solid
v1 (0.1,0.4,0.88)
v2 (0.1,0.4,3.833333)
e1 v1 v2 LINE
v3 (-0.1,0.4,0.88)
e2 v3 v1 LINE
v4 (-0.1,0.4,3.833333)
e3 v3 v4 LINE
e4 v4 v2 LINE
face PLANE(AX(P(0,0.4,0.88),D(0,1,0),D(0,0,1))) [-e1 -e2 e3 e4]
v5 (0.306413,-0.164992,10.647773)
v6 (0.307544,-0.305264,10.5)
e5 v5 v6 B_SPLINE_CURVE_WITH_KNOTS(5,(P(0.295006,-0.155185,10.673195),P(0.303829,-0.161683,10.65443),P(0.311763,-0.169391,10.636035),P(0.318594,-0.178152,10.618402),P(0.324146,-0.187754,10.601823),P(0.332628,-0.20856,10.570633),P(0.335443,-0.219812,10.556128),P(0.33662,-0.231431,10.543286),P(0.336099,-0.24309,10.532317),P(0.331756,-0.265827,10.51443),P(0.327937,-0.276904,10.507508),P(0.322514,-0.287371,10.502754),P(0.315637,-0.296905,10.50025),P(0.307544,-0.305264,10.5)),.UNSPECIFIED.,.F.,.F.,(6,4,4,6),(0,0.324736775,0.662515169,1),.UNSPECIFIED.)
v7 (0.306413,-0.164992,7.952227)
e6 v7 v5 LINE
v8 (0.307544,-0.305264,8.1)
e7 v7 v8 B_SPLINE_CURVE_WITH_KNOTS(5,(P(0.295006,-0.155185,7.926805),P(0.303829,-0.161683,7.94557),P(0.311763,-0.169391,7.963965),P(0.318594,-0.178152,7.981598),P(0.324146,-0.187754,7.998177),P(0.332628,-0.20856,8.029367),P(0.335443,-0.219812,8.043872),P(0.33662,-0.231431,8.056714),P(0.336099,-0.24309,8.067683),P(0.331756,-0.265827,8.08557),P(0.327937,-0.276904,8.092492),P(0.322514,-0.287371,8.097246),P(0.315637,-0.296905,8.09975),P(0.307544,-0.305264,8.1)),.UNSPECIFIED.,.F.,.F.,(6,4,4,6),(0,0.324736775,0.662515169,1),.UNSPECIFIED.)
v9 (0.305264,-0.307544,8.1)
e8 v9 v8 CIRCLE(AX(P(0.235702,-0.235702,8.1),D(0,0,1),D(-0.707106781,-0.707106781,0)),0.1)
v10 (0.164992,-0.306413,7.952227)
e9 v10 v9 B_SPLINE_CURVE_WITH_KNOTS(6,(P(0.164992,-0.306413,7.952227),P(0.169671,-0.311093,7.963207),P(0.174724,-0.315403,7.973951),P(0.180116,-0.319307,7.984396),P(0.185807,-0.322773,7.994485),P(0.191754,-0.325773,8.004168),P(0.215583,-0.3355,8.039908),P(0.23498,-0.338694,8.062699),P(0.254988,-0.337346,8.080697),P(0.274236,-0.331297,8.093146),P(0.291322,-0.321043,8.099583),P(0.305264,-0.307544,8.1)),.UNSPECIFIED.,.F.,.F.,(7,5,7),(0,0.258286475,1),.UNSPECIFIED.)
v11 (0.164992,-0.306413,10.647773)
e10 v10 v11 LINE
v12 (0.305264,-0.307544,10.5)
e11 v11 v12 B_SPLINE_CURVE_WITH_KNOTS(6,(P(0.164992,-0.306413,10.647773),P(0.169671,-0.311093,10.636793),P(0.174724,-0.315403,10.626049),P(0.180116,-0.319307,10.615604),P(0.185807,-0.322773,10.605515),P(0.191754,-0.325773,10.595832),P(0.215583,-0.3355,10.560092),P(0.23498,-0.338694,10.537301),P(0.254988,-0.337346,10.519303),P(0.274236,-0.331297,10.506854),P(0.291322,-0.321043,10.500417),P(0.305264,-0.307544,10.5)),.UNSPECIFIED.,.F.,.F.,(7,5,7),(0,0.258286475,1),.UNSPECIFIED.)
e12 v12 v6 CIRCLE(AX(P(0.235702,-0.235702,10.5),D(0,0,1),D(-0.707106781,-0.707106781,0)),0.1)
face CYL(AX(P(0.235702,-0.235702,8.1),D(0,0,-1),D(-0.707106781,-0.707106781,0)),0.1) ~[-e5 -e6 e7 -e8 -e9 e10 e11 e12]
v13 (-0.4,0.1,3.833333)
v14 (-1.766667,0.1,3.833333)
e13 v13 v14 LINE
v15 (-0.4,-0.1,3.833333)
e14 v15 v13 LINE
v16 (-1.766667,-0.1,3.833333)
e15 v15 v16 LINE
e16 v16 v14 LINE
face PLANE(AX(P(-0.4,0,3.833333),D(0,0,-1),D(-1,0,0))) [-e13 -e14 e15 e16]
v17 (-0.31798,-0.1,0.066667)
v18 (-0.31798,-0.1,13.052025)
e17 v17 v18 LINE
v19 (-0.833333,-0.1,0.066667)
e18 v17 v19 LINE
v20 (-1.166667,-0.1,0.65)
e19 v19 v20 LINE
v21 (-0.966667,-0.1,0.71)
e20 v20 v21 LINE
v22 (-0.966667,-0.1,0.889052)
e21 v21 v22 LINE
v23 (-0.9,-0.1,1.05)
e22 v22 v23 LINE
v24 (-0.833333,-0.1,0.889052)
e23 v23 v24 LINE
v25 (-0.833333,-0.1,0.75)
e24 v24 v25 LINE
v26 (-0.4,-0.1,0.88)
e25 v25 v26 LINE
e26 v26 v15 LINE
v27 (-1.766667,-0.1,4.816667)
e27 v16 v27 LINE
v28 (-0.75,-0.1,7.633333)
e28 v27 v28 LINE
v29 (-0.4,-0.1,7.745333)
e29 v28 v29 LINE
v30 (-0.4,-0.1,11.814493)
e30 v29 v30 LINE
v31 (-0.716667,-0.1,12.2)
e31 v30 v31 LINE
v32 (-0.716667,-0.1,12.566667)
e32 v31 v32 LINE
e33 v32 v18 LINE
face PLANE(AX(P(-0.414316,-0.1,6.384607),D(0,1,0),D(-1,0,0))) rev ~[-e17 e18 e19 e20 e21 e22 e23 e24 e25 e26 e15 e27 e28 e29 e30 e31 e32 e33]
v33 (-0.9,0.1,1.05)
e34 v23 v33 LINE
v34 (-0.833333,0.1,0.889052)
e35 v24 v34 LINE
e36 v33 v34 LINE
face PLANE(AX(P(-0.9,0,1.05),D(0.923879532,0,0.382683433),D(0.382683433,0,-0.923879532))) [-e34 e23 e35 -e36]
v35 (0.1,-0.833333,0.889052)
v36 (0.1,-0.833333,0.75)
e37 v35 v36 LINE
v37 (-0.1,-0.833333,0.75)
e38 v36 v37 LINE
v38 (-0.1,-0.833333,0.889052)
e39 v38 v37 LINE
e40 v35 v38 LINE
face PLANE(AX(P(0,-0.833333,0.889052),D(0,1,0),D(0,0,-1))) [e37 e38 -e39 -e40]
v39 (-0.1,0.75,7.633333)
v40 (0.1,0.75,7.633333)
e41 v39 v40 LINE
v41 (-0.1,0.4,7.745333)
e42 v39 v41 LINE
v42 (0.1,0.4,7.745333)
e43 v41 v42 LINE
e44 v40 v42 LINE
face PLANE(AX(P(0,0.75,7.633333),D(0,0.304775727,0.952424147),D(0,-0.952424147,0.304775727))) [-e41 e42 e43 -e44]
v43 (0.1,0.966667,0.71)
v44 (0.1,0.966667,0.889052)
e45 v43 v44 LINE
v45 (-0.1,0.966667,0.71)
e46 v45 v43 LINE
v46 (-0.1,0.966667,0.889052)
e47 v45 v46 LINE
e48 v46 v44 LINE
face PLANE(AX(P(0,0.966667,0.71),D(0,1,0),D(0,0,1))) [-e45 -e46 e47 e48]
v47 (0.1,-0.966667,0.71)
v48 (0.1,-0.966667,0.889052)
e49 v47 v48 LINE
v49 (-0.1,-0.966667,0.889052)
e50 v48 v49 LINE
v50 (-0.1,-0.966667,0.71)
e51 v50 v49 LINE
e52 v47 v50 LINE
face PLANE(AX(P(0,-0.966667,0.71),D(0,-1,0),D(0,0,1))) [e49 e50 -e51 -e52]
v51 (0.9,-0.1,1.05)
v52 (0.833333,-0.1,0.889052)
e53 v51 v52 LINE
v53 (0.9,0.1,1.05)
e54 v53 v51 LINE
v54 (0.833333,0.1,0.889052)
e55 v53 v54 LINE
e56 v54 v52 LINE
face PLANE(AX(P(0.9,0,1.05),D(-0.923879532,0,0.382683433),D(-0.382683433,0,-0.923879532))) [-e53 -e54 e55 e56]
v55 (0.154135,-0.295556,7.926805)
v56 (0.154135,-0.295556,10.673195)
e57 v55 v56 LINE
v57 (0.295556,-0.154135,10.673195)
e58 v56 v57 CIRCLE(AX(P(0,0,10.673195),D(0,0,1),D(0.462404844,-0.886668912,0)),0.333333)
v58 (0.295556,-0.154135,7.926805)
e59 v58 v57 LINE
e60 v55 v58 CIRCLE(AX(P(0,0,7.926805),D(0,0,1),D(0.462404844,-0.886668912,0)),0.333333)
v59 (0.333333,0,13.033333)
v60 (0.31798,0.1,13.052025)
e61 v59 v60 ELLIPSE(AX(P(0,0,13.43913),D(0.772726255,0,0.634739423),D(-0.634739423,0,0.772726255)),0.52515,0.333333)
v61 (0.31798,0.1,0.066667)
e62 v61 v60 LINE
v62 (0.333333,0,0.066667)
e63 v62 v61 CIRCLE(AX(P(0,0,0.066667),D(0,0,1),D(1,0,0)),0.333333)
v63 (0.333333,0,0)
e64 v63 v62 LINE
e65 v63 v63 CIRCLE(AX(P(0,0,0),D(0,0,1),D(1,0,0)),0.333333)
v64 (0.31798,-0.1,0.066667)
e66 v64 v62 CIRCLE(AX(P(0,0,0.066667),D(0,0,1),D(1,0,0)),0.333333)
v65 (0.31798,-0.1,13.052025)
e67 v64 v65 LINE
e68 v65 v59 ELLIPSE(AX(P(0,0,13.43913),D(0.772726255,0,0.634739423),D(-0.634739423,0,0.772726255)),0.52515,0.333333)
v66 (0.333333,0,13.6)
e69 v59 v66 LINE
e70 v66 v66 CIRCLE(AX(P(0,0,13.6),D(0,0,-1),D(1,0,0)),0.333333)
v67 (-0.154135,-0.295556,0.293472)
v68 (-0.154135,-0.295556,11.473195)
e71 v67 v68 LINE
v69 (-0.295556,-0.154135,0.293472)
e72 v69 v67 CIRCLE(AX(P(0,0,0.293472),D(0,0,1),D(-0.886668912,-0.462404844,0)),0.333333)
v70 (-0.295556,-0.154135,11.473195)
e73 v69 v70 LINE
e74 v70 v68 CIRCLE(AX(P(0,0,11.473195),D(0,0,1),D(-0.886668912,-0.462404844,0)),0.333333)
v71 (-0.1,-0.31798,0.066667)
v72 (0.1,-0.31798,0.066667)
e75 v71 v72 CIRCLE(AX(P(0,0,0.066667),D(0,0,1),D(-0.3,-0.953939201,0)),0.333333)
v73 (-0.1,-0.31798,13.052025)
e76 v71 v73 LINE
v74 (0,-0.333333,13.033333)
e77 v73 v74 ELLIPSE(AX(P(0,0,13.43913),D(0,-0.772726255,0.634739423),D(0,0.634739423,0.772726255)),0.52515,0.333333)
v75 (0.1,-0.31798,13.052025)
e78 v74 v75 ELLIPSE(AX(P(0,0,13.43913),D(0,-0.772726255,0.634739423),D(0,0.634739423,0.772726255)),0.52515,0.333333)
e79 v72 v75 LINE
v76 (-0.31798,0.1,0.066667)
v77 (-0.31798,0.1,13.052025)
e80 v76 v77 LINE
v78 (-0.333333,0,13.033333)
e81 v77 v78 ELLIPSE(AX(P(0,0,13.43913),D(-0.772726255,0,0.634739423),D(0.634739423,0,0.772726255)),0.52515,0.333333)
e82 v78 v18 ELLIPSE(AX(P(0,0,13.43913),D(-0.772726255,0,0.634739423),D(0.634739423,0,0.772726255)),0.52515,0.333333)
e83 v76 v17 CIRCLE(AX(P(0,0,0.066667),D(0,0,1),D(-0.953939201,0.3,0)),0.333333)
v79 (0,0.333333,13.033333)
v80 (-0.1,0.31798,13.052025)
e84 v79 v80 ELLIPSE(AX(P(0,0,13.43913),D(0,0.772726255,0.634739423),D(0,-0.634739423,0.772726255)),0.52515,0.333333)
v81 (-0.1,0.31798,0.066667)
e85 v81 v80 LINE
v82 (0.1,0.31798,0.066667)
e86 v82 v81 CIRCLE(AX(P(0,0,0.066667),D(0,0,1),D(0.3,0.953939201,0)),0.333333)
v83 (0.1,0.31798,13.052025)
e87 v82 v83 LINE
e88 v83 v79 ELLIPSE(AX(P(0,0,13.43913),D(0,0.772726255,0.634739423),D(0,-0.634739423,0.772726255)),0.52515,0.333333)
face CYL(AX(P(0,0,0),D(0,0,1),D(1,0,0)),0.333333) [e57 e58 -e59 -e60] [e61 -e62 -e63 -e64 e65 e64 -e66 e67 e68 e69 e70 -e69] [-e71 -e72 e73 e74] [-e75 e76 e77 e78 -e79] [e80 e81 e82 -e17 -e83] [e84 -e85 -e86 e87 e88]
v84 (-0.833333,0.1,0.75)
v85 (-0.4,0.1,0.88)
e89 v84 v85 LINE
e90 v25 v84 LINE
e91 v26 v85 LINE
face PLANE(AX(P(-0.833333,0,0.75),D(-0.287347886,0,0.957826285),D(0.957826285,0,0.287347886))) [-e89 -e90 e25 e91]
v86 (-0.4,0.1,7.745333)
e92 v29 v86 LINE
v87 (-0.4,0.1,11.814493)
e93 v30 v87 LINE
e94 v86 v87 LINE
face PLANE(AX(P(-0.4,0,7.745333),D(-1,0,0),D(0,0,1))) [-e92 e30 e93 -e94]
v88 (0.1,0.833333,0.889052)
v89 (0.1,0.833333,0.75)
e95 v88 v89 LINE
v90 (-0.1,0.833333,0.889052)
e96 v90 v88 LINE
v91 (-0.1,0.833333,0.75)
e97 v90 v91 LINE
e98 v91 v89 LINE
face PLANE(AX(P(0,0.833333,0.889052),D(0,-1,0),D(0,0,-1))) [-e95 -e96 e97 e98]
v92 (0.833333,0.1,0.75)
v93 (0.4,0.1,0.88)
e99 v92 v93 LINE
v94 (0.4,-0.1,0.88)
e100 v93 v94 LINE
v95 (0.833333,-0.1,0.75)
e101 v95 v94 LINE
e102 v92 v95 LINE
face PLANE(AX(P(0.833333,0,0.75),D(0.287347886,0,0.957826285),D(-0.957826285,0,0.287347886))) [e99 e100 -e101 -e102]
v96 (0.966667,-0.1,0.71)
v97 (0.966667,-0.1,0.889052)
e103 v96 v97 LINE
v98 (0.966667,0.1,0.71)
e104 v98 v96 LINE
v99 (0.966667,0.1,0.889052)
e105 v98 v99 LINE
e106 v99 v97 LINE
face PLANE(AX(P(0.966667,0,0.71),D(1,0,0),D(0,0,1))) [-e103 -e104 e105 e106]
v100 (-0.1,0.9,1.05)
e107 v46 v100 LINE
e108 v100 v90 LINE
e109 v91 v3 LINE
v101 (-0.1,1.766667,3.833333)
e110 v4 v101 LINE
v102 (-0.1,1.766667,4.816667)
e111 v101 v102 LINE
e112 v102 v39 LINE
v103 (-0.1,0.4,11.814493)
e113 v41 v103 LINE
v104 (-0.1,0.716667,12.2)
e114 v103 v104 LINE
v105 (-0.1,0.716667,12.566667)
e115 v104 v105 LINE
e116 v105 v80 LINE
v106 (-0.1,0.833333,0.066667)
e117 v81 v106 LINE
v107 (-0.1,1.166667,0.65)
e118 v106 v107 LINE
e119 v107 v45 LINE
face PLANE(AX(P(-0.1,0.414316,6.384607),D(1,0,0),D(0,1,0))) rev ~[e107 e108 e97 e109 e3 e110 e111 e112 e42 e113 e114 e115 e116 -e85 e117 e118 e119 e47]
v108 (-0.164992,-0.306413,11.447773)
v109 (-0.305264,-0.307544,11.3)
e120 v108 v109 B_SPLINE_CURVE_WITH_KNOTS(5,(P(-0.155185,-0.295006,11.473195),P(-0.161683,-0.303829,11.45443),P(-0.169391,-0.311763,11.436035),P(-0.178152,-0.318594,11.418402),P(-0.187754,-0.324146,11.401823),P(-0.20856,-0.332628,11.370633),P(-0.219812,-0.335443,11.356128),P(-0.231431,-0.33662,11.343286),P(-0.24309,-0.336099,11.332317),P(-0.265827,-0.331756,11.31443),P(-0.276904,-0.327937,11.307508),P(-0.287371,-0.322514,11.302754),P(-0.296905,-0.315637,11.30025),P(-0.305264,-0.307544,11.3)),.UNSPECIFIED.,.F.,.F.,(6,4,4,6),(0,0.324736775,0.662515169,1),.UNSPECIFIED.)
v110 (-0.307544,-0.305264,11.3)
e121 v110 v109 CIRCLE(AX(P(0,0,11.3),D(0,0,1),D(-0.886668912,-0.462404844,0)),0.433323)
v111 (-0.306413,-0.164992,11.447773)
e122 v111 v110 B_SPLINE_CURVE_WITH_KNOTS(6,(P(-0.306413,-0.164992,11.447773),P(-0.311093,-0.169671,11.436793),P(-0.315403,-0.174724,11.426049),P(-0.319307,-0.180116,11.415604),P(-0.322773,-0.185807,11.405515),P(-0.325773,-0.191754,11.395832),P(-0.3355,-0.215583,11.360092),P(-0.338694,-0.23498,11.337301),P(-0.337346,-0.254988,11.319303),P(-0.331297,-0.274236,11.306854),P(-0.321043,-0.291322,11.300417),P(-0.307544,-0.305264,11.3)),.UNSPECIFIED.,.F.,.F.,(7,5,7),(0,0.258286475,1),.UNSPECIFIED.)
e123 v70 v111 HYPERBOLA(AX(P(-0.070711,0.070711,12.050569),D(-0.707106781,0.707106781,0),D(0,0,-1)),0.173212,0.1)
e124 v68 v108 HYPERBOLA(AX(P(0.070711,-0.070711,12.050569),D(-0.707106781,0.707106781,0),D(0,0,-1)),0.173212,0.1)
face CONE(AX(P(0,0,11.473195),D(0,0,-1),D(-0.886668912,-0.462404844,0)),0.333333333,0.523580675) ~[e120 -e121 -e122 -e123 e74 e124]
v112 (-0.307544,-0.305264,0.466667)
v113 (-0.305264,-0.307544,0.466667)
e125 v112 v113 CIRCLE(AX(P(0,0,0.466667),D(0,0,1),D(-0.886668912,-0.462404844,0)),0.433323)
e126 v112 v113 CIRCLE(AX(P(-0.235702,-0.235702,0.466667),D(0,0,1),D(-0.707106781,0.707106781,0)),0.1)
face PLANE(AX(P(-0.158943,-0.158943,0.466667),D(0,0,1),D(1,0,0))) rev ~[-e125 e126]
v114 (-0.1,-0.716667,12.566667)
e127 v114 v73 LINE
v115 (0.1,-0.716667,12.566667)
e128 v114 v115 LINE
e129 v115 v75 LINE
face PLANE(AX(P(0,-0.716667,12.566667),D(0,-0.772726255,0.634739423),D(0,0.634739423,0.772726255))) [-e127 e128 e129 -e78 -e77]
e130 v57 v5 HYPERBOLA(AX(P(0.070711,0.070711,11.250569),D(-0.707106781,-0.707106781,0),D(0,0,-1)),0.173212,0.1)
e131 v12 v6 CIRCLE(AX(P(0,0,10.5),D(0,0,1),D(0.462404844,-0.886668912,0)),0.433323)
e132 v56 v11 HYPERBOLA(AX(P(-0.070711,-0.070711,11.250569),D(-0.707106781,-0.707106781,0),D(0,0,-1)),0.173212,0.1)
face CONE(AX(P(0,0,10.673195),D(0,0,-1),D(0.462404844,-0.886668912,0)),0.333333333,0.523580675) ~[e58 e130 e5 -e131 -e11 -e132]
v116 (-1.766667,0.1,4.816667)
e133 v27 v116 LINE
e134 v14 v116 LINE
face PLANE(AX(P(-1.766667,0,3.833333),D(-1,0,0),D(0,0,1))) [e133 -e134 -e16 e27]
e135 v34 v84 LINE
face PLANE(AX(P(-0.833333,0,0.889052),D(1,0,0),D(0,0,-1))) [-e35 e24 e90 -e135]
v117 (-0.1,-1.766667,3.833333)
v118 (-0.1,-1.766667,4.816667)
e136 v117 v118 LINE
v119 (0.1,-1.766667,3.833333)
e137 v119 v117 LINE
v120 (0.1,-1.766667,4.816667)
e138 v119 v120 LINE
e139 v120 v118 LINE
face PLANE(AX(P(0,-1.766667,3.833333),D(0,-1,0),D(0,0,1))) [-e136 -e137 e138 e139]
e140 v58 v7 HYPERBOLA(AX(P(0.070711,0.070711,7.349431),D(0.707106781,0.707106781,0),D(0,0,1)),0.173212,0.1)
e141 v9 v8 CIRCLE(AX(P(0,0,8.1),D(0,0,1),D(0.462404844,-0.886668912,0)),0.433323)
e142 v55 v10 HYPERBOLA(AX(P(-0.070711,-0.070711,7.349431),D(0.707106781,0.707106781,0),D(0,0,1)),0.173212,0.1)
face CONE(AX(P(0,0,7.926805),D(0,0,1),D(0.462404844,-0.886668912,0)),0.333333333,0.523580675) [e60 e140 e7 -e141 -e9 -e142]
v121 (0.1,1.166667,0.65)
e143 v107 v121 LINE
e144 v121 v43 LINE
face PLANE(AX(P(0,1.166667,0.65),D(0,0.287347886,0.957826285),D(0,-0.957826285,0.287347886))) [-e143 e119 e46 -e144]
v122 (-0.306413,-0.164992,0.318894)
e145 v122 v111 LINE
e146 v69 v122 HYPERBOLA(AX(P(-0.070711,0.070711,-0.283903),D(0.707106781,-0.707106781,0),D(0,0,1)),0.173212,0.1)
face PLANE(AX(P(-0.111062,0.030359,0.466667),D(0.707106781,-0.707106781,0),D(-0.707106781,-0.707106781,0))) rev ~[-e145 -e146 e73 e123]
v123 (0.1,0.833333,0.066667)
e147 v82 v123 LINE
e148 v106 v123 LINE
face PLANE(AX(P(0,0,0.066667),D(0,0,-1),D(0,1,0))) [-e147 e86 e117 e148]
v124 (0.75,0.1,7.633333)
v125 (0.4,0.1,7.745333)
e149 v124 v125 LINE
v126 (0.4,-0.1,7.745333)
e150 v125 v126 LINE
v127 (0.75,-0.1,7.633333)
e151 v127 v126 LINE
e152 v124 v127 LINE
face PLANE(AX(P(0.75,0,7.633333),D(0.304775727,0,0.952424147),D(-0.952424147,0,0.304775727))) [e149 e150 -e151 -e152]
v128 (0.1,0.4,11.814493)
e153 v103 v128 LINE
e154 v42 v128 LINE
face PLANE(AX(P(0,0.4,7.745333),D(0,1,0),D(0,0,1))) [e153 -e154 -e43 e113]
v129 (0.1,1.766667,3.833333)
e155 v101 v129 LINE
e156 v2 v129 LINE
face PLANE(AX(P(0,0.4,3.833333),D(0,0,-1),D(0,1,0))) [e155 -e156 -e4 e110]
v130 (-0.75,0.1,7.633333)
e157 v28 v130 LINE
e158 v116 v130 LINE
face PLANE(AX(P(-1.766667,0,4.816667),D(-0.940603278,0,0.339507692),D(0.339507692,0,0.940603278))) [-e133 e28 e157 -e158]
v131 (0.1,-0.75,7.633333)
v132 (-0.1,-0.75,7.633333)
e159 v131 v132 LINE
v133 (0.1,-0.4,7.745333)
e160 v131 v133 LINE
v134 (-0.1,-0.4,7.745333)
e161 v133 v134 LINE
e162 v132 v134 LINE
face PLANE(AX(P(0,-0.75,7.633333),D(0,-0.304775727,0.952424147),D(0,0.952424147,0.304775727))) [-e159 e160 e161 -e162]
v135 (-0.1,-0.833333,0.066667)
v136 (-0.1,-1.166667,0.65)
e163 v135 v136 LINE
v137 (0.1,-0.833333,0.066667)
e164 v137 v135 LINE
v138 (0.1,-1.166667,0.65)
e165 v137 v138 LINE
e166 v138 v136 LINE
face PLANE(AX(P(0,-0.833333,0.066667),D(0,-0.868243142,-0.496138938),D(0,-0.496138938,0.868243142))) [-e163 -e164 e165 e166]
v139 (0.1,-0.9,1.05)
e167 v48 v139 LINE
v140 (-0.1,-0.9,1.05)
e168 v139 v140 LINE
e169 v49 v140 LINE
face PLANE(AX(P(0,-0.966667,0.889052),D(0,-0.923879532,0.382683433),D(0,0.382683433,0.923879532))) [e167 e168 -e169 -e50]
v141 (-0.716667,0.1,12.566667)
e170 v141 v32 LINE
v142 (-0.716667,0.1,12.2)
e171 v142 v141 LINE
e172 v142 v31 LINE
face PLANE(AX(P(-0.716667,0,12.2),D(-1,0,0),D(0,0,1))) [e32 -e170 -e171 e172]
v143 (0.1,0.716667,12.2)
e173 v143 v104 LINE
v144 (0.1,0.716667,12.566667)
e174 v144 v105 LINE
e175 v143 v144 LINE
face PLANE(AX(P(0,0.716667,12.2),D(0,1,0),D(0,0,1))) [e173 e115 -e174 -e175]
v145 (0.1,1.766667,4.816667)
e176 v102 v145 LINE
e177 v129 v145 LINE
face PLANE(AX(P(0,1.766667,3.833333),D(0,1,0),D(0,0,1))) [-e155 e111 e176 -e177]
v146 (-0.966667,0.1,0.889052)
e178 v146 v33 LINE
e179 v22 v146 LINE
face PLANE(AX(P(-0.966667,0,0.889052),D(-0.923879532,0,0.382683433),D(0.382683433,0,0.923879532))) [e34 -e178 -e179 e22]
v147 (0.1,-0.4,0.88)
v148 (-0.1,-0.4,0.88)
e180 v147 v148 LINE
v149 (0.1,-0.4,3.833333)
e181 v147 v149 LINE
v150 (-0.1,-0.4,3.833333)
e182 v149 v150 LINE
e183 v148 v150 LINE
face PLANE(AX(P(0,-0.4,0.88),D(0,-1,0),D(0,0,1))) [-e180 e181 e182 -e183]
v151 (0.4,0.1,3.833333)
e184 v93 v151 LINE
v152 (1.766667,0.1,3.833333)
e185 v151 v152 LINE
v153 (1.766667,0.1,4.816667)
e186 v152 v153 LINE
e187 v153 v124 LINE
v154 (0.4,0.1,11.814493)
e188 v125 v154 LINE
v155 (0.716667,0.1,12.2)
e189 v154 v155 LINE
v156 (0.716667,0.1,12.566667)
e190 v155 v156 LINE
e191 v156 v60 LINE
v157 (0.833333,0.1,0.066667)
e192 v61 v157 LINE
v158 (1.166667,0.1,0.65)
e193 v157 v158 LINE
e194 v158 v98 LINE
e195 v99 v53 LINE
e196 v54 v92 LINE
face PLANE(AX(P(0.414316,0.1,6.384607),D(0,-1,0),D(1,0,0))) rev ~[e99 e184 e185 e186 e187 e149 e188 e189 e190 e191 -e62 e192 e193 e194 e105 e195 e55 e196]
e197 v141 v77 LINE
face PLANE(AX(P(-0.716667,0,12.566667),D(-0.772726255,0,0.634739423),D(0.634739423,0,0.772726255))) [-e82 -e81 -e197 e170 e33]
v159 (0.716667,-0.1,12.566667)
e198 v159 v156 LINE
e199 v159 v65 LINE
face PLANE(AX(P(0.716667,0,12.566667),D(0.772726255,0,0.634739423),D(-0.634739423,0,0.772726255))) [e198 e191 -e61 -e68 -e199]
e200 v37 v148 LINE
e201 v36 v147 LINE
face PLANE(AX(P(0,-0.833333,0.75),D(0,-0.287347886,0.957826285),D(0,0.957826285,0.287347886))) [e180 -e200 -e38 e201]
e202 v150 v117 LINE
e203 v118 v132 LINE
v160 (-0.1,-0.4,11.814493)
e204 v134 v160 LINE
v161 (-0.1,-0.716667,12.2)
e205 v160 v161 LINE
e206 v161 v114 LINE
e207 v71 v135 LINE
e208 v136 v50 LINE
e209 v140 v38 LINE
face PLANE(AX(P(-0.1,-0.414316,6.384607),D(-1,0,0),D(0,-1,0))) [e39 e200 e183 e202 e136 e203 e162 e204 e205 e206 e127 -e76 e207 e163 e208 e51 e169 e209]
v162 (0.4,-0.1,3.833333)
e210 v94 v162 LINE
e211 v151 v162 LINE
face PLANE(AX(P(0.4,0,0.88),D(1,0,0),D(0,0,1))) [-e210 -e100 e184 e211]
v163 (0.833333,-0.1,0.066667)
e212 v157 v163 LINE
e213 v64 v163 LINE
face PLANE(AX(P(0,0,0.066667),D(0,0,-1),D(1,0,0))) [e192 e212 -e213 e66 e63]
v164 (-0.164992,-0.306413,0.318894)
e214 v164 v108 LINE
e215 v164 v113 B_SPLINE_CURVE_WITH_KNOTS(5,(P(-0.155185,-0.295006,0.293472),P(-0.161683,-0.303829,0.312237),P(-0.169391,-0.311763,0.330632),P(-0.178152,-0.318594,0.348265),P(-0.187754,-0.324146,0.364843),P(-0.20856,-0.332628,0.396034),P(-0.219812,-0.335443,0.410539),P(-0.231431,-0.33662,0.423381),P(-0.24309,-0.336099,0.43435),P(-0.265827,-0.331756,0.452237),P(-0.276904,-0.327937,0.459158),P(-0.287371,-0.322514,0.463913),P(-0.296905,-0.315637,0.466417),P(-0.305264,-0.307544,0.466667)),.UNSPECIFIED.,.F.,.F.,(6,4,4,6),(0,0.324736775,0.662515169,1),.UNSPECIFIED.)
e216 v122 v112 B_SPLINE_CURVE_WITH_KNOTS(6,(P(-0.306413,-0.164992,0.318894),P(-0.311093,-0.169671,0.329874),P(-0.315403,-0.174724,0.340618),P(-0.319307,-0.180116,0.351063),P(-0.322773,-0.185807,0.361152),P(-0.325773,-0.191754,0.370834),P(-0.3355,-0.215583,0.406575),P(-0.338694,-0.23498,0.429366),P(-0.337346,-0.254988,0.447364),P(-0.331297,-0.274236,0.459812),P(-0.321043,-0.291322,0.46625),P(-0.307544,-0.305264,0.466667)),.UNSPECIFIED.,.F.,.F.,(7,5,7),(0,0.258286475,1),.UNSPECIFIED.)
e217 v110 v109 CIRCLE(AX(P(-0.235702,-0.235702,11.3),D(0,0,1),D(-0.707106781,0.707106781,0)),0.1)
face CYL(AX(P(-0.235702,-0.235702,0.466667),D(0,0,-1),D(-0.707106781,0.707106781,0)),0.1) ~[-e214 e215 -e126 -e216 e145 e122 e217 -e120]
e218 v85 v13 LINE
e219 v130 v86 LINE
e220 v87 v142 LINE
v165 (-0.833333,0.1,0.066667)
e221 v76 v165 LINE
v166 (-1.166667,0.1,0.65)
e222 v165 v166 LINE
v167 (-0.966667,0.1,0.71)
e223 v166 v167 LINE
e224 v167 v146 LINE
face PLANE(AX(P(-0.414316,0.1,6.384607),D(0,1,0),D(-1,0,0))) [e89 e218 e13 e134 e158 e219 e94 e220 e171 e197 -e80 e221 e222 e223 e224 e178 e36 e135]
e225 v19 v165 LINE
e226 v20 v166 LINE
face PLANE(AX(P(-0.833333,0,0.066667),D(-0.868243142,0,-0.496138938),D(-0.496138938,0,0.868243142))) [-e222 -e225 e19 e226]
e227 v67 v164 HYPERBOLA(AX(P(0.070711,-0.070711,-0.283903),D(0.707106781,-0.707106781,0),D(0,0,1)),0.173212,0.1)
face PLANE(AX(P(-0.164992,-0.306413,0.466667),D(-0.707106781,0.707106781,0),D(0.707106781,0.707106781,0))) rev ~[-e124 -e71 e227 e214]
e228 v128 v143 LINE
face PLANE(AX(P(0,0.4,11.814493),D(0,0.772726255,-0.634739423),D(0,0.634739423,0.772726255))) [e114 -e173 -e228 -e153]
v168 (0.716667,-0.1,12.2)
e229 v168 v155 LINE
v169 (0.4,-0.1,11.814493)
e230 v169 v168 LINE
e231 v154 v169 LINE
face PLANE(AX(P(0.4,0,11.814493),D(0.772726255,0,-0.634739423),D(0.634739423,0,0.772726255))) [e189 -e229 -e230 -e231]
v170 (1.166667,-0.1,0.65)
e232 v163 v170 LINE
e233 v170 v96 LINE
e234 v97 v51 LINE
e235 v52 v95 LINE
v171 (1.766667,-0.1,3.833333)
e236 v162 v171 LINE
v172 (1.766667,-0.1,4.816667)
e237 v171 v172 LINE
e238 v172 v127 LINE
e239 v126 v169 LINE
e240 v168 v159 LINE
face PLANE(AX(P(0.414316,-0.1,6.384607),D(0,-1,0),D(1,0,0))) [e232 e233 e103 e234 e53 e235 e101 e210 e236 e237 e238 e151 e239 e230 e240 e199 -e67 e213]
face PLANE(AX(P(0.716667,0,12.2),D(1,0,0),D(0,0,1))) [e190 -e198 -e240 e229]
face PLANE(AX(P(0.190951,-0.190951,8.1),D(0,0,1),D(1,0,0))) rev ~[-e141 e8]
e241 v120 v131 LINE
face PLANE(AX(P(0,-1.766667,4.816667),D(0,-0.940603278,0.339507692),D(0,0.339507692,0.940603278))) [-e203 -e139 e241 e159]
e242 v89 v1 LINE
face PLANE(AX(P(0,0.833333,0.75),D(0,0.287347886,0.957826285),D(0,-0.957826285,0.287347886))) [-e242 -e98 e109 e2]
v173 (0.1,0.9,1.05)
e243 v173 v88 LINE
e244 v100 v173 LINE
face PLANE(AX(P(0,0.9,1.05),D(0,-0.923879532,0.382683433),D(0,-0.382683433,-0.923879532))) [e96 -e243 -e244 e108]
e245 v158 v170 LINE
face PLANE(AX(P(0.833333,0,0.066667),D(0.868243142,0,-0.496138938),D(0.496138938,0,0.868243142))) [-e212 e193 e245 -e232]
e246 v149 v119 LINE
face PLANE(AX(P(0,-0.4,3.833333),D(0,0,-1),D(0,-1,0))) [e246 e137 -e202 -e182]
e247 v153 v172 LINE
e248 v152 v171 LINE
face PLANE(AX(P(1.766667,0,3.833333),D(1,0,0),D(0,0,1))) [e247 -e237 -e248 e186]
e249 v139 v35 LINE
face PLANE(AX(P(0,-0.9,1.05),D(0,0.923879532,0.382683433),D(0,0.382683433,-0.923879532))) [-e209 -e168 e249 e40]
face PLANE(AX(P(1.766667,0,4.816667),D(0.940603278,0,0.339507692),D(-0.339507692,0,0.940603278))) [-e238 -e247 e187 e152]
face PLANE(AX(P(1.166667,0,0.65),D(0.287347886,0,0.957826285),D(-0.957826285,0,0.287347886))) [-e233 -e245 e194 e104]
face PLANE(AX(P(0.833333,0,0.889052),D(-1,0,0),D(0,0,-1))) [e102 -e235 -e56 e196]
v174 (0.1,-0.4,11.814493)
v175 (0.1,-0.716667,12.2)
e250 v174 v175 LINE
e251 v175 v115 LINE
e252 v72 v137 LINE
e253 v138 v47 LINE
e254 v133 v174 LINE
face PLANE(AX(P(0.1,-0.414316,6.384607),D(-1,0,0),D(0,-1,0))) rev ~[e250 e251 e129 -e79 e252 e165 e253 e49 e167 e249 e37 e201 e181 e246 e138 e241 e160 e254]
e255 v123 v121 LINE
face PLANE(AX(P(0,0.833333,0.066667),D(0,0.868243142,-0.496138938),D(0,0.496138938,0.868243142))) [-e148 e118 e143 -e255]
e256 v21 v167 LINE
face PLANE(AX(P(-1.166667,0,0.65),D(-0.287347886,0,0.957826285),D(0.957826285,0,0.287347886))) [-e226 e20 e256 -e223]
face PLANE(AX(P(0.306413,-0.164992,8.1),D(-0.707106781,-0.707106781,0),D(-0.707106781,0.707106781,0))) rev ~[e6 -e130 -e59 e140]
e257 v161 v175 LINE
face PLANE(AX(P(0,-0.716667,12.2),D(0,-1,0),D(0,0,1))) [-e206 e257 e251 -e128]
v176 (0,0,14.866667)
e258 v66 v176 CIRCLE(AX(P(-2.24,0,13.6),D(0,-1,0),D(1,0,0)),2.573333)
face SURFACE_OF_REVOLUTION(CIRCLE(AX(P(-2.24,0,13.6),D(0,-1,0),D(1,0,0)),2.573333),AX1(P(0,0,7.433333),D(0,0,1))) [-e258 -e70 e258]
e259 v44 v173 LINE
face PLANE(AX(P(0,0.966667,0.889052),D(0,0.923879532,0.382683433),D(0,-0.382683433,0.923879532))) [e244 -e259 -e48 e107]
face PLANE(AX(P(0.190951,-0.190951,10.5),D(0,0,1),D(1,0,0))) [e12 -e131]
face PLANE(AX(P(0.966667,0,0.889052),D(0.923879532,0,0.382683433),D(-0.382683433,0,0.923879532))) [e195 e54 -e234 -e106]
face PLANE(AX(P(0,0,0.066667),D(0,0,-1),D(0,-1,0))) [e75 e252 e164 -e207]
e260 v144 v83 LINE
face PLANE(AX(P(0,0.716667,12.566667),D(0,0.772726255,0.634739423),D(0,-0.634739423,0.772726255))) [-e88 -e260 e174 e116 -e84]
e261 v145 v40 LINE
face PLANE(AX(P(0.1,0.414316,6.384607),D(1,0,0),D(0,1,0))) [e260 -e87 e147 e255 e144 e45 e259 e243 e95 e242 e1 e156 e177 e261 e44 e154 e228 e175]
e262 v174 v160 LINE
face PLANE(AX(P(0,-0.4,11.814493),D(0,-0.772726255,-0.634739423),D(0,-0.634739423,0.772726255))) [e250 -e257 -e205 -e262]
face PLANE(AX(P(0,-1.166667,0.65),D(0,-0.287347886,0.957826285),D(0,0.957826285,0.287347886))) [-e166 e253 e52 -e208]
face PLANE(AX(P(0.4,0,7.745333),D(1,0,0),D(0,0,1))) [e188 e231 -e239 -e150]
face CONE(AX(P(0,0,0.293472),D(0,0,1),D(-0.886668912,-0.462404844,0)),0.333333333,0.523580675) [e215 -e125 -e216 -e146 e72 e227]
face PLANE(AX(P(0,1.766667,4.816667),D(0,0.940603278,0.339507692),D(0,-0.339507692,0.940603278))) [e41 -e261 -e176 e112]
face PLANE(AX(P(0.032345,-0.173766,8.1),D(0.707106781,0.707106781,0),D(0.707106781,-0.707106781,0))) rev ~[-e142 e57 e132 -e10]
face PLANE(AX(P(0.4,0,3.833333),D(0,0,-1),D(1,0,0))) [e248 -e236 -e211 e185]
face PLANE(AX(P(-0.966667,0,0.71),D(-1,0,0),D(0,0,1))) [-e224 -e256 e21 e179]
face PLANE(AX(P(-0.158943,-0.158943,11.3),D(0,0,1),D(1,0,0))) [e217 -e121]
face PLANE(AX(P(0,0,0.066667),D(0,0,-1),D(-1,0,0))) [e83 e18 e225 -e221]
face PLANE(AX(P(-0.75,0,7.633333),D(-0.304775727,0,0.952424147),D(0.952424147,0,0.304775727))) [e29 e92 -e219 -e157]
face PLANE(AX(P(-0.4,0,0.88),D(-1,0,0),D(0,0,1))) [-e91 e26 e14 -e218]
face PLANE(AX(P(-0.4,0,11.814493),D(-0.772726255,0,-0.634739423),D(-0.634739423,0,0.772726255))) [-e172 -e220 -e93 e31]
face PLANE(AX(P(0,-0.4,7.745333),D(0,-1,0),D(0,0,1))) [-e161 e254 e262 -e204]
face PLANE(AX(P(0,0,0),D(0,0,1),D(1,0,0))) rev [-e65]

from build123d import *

# Parameters (mm, degrees)
F4_DEPTH  = 0.1
F5_COUNT  = 4
F8_DEPTH  = 10.8333333333
F11_DEPTH = 2.4
F12_SIZE2 = 0.09999
F12_SIZE  = 0.173195


# Not quite as in the source:
# - a fillet or chamfer is up to 0.001 mm smaller than in the source, because OpenCascade refuses the exact size


with BuildPart() as f2:
    # F1 (on Front) → F2 (revolve)
    with BuildSketch(Plane.XZ):
        with BuildLine():
            Line((0, 14.8666666667), (0, 0))
            Line((0, 0), (0.3333333333, 0))
            Line((0.3333333333, 0), (0.3333333333, 13.6))
            ThreePointArc((0.3333333333, 13.6), (0.2486051426, 14.2548960901), (0, 14.8666666667))
        make_face()
    revolve(axis=Axis((0, 0, 7.4333333333), (0, 0, 1)))

    # F3 (on Front) → F4 (join, symmetric)
    with BuildSketch(Plane.XZ):
        Polygon((0, 13.4391304348), (0, 0.0666666667), (0.8333333333, 0.0666666667), (1.1666666667, 0.65), (0.9666666667, 0.71), (0.8333333333, 0.75), (0.4, 0.88), (0.4, 3.8333333333), (1.7666666667, 3.8333333333), (1.7666666667, 4.8166666667), (0.75, 7.6333333333), (0.4, 7.7453333333), (0.4, 11.8144927536), (0.7166666667, 12.2), (0.7166666667, 12.5666666667), align=None)
        Polygon((0.8333333333, 0.75), (0.9666666667, 0.71), (0.9666666667, 0.8890524292), (0.9, 1.05), (0.8333333333, 0.8890524292), align=None)
    extrude(amount=F4_DEPTH, both=True)

    # F5: F2 ×4 about axis
    f5_axis = Axis((0, 0, 0), (0, 0, 1))


with BuildPart() as f2_1:
    add(f2.part)
    for i in range(1, F5_COUNT):
        add(f2.part.rotate(f5_axis, i * 360 / F5_COUNT))

    # F7 (on offset) → F8 (join)
    with BuildSketch(Plane.XY.offset(0.4666666667)):
        with BuildLine():
            Line((-0.1110620592, 0.030359297), (-0.3064129385, -0.1649915823))
            ThreePointArc((-0.3064129385, -0.1649915823), (-0.3064129385, -0.3064129385), (-0.1649915823, -0.3064129385))
            Line((-0.1649915823, -0.3064129385), (0.030359297, -0.1110620592))
            Line((0.030359297, -0.1110620592), (-0.1110620592, 0.030359297))
        make_face()
    extrude(amount=F8_DEPTH)

    # F10 (on offset) → F11 (join)
    with BuildSketch(Plane.XY.offset(8.1)):
        with BuildLine():
            Line((0.1737662231, -0.0323448669), (0.0323448669, -0.1737662231))
            Line((0.0323448669, -0.1737662231), (0.1649915823, -0.3064129385))
            ThreePointArc((0.1649915823, -0.3064129385), (0.3064129385, -0.3064129385), (0.3064129385, -0.1649915823))
            Line((0.3064129385, -0.1649915823), (0.1737662231, -0.0323448669))
        make_face()
    extrude(amount=F11_DEPTH)

    # F12 (call 1 of 4: OpenCascade refuses the feature's edges together) (size 0.1732050808 and 0.1 in the source; OpenCascade refuses exactly that, so slightly less here)
    f12_edges = [f2_1.edges().sort_by_distance(p)[0] for p in [
        (-0.235702, -0.235702, 11.3),
    ]]
    f12_side = f2_1.faces().sort_by_distance((-0.333333, 0, 0.013633))[0]
    chamfer(f12_edges, length=F12_SIZE, length2=F12_SIZE2, reference=f12_side)

    # F12#2 (call 2 of 4) (size 0.1732050808 and 0.1 in the source; OpenCascade refuses exactly that, so slightly less here)
    f12_2_edges = [f2_1.edges().sort_by_distance(p)[0] for p in [
        (-0.235702, -0.235702, 0.466667),
    ]]
    f12_2_side = f2_1.faces().sort_by_distance((-0.333333, 0, 0.013633))[0]
    chamfer(f12_2_edges, length=F12_SIZE, length2=F12_SIZE2, reference=f12_2_side)

    # F12#3 (call 3 of 4) (size 0.1732050808 and 0.1 in the source; OpenCascade refuses exactly that, so slightly less here)
    f12_3_edges = [f2_1.edges().sort_by_distance(p)[0] for p in [
        (0.235702, -0.235702, 8.1),
    ]]
    f12_3_side = f2_1.faces().sort_by_distance((-0.333333, 0, 0.013633))[0]
    chamfer(f12_3_edges, length=F12_SIZE, length2=F12_SIZE2, reference=f12_3_side)

    # F12#4 (call 4 of 4) (size 0.1732050808 and 0.1 in the source; OpenCascade refuses exactly that, so slightly less here)
    f12_4_edges = [f2_1.edges().sort_by_distance(p)[0] for p in [
        (0.235702, -0.235702, 10.5),
    ]]
    f12_4_side = f2_1.faces().sort_by_distance((-0.333333, 0, 0.013633))[0]
    chamfer(f12_4_edges, length=F12_SIZE, length2=F12_SIZE2, reference=f12_4_side)


solid = f2_1.part
